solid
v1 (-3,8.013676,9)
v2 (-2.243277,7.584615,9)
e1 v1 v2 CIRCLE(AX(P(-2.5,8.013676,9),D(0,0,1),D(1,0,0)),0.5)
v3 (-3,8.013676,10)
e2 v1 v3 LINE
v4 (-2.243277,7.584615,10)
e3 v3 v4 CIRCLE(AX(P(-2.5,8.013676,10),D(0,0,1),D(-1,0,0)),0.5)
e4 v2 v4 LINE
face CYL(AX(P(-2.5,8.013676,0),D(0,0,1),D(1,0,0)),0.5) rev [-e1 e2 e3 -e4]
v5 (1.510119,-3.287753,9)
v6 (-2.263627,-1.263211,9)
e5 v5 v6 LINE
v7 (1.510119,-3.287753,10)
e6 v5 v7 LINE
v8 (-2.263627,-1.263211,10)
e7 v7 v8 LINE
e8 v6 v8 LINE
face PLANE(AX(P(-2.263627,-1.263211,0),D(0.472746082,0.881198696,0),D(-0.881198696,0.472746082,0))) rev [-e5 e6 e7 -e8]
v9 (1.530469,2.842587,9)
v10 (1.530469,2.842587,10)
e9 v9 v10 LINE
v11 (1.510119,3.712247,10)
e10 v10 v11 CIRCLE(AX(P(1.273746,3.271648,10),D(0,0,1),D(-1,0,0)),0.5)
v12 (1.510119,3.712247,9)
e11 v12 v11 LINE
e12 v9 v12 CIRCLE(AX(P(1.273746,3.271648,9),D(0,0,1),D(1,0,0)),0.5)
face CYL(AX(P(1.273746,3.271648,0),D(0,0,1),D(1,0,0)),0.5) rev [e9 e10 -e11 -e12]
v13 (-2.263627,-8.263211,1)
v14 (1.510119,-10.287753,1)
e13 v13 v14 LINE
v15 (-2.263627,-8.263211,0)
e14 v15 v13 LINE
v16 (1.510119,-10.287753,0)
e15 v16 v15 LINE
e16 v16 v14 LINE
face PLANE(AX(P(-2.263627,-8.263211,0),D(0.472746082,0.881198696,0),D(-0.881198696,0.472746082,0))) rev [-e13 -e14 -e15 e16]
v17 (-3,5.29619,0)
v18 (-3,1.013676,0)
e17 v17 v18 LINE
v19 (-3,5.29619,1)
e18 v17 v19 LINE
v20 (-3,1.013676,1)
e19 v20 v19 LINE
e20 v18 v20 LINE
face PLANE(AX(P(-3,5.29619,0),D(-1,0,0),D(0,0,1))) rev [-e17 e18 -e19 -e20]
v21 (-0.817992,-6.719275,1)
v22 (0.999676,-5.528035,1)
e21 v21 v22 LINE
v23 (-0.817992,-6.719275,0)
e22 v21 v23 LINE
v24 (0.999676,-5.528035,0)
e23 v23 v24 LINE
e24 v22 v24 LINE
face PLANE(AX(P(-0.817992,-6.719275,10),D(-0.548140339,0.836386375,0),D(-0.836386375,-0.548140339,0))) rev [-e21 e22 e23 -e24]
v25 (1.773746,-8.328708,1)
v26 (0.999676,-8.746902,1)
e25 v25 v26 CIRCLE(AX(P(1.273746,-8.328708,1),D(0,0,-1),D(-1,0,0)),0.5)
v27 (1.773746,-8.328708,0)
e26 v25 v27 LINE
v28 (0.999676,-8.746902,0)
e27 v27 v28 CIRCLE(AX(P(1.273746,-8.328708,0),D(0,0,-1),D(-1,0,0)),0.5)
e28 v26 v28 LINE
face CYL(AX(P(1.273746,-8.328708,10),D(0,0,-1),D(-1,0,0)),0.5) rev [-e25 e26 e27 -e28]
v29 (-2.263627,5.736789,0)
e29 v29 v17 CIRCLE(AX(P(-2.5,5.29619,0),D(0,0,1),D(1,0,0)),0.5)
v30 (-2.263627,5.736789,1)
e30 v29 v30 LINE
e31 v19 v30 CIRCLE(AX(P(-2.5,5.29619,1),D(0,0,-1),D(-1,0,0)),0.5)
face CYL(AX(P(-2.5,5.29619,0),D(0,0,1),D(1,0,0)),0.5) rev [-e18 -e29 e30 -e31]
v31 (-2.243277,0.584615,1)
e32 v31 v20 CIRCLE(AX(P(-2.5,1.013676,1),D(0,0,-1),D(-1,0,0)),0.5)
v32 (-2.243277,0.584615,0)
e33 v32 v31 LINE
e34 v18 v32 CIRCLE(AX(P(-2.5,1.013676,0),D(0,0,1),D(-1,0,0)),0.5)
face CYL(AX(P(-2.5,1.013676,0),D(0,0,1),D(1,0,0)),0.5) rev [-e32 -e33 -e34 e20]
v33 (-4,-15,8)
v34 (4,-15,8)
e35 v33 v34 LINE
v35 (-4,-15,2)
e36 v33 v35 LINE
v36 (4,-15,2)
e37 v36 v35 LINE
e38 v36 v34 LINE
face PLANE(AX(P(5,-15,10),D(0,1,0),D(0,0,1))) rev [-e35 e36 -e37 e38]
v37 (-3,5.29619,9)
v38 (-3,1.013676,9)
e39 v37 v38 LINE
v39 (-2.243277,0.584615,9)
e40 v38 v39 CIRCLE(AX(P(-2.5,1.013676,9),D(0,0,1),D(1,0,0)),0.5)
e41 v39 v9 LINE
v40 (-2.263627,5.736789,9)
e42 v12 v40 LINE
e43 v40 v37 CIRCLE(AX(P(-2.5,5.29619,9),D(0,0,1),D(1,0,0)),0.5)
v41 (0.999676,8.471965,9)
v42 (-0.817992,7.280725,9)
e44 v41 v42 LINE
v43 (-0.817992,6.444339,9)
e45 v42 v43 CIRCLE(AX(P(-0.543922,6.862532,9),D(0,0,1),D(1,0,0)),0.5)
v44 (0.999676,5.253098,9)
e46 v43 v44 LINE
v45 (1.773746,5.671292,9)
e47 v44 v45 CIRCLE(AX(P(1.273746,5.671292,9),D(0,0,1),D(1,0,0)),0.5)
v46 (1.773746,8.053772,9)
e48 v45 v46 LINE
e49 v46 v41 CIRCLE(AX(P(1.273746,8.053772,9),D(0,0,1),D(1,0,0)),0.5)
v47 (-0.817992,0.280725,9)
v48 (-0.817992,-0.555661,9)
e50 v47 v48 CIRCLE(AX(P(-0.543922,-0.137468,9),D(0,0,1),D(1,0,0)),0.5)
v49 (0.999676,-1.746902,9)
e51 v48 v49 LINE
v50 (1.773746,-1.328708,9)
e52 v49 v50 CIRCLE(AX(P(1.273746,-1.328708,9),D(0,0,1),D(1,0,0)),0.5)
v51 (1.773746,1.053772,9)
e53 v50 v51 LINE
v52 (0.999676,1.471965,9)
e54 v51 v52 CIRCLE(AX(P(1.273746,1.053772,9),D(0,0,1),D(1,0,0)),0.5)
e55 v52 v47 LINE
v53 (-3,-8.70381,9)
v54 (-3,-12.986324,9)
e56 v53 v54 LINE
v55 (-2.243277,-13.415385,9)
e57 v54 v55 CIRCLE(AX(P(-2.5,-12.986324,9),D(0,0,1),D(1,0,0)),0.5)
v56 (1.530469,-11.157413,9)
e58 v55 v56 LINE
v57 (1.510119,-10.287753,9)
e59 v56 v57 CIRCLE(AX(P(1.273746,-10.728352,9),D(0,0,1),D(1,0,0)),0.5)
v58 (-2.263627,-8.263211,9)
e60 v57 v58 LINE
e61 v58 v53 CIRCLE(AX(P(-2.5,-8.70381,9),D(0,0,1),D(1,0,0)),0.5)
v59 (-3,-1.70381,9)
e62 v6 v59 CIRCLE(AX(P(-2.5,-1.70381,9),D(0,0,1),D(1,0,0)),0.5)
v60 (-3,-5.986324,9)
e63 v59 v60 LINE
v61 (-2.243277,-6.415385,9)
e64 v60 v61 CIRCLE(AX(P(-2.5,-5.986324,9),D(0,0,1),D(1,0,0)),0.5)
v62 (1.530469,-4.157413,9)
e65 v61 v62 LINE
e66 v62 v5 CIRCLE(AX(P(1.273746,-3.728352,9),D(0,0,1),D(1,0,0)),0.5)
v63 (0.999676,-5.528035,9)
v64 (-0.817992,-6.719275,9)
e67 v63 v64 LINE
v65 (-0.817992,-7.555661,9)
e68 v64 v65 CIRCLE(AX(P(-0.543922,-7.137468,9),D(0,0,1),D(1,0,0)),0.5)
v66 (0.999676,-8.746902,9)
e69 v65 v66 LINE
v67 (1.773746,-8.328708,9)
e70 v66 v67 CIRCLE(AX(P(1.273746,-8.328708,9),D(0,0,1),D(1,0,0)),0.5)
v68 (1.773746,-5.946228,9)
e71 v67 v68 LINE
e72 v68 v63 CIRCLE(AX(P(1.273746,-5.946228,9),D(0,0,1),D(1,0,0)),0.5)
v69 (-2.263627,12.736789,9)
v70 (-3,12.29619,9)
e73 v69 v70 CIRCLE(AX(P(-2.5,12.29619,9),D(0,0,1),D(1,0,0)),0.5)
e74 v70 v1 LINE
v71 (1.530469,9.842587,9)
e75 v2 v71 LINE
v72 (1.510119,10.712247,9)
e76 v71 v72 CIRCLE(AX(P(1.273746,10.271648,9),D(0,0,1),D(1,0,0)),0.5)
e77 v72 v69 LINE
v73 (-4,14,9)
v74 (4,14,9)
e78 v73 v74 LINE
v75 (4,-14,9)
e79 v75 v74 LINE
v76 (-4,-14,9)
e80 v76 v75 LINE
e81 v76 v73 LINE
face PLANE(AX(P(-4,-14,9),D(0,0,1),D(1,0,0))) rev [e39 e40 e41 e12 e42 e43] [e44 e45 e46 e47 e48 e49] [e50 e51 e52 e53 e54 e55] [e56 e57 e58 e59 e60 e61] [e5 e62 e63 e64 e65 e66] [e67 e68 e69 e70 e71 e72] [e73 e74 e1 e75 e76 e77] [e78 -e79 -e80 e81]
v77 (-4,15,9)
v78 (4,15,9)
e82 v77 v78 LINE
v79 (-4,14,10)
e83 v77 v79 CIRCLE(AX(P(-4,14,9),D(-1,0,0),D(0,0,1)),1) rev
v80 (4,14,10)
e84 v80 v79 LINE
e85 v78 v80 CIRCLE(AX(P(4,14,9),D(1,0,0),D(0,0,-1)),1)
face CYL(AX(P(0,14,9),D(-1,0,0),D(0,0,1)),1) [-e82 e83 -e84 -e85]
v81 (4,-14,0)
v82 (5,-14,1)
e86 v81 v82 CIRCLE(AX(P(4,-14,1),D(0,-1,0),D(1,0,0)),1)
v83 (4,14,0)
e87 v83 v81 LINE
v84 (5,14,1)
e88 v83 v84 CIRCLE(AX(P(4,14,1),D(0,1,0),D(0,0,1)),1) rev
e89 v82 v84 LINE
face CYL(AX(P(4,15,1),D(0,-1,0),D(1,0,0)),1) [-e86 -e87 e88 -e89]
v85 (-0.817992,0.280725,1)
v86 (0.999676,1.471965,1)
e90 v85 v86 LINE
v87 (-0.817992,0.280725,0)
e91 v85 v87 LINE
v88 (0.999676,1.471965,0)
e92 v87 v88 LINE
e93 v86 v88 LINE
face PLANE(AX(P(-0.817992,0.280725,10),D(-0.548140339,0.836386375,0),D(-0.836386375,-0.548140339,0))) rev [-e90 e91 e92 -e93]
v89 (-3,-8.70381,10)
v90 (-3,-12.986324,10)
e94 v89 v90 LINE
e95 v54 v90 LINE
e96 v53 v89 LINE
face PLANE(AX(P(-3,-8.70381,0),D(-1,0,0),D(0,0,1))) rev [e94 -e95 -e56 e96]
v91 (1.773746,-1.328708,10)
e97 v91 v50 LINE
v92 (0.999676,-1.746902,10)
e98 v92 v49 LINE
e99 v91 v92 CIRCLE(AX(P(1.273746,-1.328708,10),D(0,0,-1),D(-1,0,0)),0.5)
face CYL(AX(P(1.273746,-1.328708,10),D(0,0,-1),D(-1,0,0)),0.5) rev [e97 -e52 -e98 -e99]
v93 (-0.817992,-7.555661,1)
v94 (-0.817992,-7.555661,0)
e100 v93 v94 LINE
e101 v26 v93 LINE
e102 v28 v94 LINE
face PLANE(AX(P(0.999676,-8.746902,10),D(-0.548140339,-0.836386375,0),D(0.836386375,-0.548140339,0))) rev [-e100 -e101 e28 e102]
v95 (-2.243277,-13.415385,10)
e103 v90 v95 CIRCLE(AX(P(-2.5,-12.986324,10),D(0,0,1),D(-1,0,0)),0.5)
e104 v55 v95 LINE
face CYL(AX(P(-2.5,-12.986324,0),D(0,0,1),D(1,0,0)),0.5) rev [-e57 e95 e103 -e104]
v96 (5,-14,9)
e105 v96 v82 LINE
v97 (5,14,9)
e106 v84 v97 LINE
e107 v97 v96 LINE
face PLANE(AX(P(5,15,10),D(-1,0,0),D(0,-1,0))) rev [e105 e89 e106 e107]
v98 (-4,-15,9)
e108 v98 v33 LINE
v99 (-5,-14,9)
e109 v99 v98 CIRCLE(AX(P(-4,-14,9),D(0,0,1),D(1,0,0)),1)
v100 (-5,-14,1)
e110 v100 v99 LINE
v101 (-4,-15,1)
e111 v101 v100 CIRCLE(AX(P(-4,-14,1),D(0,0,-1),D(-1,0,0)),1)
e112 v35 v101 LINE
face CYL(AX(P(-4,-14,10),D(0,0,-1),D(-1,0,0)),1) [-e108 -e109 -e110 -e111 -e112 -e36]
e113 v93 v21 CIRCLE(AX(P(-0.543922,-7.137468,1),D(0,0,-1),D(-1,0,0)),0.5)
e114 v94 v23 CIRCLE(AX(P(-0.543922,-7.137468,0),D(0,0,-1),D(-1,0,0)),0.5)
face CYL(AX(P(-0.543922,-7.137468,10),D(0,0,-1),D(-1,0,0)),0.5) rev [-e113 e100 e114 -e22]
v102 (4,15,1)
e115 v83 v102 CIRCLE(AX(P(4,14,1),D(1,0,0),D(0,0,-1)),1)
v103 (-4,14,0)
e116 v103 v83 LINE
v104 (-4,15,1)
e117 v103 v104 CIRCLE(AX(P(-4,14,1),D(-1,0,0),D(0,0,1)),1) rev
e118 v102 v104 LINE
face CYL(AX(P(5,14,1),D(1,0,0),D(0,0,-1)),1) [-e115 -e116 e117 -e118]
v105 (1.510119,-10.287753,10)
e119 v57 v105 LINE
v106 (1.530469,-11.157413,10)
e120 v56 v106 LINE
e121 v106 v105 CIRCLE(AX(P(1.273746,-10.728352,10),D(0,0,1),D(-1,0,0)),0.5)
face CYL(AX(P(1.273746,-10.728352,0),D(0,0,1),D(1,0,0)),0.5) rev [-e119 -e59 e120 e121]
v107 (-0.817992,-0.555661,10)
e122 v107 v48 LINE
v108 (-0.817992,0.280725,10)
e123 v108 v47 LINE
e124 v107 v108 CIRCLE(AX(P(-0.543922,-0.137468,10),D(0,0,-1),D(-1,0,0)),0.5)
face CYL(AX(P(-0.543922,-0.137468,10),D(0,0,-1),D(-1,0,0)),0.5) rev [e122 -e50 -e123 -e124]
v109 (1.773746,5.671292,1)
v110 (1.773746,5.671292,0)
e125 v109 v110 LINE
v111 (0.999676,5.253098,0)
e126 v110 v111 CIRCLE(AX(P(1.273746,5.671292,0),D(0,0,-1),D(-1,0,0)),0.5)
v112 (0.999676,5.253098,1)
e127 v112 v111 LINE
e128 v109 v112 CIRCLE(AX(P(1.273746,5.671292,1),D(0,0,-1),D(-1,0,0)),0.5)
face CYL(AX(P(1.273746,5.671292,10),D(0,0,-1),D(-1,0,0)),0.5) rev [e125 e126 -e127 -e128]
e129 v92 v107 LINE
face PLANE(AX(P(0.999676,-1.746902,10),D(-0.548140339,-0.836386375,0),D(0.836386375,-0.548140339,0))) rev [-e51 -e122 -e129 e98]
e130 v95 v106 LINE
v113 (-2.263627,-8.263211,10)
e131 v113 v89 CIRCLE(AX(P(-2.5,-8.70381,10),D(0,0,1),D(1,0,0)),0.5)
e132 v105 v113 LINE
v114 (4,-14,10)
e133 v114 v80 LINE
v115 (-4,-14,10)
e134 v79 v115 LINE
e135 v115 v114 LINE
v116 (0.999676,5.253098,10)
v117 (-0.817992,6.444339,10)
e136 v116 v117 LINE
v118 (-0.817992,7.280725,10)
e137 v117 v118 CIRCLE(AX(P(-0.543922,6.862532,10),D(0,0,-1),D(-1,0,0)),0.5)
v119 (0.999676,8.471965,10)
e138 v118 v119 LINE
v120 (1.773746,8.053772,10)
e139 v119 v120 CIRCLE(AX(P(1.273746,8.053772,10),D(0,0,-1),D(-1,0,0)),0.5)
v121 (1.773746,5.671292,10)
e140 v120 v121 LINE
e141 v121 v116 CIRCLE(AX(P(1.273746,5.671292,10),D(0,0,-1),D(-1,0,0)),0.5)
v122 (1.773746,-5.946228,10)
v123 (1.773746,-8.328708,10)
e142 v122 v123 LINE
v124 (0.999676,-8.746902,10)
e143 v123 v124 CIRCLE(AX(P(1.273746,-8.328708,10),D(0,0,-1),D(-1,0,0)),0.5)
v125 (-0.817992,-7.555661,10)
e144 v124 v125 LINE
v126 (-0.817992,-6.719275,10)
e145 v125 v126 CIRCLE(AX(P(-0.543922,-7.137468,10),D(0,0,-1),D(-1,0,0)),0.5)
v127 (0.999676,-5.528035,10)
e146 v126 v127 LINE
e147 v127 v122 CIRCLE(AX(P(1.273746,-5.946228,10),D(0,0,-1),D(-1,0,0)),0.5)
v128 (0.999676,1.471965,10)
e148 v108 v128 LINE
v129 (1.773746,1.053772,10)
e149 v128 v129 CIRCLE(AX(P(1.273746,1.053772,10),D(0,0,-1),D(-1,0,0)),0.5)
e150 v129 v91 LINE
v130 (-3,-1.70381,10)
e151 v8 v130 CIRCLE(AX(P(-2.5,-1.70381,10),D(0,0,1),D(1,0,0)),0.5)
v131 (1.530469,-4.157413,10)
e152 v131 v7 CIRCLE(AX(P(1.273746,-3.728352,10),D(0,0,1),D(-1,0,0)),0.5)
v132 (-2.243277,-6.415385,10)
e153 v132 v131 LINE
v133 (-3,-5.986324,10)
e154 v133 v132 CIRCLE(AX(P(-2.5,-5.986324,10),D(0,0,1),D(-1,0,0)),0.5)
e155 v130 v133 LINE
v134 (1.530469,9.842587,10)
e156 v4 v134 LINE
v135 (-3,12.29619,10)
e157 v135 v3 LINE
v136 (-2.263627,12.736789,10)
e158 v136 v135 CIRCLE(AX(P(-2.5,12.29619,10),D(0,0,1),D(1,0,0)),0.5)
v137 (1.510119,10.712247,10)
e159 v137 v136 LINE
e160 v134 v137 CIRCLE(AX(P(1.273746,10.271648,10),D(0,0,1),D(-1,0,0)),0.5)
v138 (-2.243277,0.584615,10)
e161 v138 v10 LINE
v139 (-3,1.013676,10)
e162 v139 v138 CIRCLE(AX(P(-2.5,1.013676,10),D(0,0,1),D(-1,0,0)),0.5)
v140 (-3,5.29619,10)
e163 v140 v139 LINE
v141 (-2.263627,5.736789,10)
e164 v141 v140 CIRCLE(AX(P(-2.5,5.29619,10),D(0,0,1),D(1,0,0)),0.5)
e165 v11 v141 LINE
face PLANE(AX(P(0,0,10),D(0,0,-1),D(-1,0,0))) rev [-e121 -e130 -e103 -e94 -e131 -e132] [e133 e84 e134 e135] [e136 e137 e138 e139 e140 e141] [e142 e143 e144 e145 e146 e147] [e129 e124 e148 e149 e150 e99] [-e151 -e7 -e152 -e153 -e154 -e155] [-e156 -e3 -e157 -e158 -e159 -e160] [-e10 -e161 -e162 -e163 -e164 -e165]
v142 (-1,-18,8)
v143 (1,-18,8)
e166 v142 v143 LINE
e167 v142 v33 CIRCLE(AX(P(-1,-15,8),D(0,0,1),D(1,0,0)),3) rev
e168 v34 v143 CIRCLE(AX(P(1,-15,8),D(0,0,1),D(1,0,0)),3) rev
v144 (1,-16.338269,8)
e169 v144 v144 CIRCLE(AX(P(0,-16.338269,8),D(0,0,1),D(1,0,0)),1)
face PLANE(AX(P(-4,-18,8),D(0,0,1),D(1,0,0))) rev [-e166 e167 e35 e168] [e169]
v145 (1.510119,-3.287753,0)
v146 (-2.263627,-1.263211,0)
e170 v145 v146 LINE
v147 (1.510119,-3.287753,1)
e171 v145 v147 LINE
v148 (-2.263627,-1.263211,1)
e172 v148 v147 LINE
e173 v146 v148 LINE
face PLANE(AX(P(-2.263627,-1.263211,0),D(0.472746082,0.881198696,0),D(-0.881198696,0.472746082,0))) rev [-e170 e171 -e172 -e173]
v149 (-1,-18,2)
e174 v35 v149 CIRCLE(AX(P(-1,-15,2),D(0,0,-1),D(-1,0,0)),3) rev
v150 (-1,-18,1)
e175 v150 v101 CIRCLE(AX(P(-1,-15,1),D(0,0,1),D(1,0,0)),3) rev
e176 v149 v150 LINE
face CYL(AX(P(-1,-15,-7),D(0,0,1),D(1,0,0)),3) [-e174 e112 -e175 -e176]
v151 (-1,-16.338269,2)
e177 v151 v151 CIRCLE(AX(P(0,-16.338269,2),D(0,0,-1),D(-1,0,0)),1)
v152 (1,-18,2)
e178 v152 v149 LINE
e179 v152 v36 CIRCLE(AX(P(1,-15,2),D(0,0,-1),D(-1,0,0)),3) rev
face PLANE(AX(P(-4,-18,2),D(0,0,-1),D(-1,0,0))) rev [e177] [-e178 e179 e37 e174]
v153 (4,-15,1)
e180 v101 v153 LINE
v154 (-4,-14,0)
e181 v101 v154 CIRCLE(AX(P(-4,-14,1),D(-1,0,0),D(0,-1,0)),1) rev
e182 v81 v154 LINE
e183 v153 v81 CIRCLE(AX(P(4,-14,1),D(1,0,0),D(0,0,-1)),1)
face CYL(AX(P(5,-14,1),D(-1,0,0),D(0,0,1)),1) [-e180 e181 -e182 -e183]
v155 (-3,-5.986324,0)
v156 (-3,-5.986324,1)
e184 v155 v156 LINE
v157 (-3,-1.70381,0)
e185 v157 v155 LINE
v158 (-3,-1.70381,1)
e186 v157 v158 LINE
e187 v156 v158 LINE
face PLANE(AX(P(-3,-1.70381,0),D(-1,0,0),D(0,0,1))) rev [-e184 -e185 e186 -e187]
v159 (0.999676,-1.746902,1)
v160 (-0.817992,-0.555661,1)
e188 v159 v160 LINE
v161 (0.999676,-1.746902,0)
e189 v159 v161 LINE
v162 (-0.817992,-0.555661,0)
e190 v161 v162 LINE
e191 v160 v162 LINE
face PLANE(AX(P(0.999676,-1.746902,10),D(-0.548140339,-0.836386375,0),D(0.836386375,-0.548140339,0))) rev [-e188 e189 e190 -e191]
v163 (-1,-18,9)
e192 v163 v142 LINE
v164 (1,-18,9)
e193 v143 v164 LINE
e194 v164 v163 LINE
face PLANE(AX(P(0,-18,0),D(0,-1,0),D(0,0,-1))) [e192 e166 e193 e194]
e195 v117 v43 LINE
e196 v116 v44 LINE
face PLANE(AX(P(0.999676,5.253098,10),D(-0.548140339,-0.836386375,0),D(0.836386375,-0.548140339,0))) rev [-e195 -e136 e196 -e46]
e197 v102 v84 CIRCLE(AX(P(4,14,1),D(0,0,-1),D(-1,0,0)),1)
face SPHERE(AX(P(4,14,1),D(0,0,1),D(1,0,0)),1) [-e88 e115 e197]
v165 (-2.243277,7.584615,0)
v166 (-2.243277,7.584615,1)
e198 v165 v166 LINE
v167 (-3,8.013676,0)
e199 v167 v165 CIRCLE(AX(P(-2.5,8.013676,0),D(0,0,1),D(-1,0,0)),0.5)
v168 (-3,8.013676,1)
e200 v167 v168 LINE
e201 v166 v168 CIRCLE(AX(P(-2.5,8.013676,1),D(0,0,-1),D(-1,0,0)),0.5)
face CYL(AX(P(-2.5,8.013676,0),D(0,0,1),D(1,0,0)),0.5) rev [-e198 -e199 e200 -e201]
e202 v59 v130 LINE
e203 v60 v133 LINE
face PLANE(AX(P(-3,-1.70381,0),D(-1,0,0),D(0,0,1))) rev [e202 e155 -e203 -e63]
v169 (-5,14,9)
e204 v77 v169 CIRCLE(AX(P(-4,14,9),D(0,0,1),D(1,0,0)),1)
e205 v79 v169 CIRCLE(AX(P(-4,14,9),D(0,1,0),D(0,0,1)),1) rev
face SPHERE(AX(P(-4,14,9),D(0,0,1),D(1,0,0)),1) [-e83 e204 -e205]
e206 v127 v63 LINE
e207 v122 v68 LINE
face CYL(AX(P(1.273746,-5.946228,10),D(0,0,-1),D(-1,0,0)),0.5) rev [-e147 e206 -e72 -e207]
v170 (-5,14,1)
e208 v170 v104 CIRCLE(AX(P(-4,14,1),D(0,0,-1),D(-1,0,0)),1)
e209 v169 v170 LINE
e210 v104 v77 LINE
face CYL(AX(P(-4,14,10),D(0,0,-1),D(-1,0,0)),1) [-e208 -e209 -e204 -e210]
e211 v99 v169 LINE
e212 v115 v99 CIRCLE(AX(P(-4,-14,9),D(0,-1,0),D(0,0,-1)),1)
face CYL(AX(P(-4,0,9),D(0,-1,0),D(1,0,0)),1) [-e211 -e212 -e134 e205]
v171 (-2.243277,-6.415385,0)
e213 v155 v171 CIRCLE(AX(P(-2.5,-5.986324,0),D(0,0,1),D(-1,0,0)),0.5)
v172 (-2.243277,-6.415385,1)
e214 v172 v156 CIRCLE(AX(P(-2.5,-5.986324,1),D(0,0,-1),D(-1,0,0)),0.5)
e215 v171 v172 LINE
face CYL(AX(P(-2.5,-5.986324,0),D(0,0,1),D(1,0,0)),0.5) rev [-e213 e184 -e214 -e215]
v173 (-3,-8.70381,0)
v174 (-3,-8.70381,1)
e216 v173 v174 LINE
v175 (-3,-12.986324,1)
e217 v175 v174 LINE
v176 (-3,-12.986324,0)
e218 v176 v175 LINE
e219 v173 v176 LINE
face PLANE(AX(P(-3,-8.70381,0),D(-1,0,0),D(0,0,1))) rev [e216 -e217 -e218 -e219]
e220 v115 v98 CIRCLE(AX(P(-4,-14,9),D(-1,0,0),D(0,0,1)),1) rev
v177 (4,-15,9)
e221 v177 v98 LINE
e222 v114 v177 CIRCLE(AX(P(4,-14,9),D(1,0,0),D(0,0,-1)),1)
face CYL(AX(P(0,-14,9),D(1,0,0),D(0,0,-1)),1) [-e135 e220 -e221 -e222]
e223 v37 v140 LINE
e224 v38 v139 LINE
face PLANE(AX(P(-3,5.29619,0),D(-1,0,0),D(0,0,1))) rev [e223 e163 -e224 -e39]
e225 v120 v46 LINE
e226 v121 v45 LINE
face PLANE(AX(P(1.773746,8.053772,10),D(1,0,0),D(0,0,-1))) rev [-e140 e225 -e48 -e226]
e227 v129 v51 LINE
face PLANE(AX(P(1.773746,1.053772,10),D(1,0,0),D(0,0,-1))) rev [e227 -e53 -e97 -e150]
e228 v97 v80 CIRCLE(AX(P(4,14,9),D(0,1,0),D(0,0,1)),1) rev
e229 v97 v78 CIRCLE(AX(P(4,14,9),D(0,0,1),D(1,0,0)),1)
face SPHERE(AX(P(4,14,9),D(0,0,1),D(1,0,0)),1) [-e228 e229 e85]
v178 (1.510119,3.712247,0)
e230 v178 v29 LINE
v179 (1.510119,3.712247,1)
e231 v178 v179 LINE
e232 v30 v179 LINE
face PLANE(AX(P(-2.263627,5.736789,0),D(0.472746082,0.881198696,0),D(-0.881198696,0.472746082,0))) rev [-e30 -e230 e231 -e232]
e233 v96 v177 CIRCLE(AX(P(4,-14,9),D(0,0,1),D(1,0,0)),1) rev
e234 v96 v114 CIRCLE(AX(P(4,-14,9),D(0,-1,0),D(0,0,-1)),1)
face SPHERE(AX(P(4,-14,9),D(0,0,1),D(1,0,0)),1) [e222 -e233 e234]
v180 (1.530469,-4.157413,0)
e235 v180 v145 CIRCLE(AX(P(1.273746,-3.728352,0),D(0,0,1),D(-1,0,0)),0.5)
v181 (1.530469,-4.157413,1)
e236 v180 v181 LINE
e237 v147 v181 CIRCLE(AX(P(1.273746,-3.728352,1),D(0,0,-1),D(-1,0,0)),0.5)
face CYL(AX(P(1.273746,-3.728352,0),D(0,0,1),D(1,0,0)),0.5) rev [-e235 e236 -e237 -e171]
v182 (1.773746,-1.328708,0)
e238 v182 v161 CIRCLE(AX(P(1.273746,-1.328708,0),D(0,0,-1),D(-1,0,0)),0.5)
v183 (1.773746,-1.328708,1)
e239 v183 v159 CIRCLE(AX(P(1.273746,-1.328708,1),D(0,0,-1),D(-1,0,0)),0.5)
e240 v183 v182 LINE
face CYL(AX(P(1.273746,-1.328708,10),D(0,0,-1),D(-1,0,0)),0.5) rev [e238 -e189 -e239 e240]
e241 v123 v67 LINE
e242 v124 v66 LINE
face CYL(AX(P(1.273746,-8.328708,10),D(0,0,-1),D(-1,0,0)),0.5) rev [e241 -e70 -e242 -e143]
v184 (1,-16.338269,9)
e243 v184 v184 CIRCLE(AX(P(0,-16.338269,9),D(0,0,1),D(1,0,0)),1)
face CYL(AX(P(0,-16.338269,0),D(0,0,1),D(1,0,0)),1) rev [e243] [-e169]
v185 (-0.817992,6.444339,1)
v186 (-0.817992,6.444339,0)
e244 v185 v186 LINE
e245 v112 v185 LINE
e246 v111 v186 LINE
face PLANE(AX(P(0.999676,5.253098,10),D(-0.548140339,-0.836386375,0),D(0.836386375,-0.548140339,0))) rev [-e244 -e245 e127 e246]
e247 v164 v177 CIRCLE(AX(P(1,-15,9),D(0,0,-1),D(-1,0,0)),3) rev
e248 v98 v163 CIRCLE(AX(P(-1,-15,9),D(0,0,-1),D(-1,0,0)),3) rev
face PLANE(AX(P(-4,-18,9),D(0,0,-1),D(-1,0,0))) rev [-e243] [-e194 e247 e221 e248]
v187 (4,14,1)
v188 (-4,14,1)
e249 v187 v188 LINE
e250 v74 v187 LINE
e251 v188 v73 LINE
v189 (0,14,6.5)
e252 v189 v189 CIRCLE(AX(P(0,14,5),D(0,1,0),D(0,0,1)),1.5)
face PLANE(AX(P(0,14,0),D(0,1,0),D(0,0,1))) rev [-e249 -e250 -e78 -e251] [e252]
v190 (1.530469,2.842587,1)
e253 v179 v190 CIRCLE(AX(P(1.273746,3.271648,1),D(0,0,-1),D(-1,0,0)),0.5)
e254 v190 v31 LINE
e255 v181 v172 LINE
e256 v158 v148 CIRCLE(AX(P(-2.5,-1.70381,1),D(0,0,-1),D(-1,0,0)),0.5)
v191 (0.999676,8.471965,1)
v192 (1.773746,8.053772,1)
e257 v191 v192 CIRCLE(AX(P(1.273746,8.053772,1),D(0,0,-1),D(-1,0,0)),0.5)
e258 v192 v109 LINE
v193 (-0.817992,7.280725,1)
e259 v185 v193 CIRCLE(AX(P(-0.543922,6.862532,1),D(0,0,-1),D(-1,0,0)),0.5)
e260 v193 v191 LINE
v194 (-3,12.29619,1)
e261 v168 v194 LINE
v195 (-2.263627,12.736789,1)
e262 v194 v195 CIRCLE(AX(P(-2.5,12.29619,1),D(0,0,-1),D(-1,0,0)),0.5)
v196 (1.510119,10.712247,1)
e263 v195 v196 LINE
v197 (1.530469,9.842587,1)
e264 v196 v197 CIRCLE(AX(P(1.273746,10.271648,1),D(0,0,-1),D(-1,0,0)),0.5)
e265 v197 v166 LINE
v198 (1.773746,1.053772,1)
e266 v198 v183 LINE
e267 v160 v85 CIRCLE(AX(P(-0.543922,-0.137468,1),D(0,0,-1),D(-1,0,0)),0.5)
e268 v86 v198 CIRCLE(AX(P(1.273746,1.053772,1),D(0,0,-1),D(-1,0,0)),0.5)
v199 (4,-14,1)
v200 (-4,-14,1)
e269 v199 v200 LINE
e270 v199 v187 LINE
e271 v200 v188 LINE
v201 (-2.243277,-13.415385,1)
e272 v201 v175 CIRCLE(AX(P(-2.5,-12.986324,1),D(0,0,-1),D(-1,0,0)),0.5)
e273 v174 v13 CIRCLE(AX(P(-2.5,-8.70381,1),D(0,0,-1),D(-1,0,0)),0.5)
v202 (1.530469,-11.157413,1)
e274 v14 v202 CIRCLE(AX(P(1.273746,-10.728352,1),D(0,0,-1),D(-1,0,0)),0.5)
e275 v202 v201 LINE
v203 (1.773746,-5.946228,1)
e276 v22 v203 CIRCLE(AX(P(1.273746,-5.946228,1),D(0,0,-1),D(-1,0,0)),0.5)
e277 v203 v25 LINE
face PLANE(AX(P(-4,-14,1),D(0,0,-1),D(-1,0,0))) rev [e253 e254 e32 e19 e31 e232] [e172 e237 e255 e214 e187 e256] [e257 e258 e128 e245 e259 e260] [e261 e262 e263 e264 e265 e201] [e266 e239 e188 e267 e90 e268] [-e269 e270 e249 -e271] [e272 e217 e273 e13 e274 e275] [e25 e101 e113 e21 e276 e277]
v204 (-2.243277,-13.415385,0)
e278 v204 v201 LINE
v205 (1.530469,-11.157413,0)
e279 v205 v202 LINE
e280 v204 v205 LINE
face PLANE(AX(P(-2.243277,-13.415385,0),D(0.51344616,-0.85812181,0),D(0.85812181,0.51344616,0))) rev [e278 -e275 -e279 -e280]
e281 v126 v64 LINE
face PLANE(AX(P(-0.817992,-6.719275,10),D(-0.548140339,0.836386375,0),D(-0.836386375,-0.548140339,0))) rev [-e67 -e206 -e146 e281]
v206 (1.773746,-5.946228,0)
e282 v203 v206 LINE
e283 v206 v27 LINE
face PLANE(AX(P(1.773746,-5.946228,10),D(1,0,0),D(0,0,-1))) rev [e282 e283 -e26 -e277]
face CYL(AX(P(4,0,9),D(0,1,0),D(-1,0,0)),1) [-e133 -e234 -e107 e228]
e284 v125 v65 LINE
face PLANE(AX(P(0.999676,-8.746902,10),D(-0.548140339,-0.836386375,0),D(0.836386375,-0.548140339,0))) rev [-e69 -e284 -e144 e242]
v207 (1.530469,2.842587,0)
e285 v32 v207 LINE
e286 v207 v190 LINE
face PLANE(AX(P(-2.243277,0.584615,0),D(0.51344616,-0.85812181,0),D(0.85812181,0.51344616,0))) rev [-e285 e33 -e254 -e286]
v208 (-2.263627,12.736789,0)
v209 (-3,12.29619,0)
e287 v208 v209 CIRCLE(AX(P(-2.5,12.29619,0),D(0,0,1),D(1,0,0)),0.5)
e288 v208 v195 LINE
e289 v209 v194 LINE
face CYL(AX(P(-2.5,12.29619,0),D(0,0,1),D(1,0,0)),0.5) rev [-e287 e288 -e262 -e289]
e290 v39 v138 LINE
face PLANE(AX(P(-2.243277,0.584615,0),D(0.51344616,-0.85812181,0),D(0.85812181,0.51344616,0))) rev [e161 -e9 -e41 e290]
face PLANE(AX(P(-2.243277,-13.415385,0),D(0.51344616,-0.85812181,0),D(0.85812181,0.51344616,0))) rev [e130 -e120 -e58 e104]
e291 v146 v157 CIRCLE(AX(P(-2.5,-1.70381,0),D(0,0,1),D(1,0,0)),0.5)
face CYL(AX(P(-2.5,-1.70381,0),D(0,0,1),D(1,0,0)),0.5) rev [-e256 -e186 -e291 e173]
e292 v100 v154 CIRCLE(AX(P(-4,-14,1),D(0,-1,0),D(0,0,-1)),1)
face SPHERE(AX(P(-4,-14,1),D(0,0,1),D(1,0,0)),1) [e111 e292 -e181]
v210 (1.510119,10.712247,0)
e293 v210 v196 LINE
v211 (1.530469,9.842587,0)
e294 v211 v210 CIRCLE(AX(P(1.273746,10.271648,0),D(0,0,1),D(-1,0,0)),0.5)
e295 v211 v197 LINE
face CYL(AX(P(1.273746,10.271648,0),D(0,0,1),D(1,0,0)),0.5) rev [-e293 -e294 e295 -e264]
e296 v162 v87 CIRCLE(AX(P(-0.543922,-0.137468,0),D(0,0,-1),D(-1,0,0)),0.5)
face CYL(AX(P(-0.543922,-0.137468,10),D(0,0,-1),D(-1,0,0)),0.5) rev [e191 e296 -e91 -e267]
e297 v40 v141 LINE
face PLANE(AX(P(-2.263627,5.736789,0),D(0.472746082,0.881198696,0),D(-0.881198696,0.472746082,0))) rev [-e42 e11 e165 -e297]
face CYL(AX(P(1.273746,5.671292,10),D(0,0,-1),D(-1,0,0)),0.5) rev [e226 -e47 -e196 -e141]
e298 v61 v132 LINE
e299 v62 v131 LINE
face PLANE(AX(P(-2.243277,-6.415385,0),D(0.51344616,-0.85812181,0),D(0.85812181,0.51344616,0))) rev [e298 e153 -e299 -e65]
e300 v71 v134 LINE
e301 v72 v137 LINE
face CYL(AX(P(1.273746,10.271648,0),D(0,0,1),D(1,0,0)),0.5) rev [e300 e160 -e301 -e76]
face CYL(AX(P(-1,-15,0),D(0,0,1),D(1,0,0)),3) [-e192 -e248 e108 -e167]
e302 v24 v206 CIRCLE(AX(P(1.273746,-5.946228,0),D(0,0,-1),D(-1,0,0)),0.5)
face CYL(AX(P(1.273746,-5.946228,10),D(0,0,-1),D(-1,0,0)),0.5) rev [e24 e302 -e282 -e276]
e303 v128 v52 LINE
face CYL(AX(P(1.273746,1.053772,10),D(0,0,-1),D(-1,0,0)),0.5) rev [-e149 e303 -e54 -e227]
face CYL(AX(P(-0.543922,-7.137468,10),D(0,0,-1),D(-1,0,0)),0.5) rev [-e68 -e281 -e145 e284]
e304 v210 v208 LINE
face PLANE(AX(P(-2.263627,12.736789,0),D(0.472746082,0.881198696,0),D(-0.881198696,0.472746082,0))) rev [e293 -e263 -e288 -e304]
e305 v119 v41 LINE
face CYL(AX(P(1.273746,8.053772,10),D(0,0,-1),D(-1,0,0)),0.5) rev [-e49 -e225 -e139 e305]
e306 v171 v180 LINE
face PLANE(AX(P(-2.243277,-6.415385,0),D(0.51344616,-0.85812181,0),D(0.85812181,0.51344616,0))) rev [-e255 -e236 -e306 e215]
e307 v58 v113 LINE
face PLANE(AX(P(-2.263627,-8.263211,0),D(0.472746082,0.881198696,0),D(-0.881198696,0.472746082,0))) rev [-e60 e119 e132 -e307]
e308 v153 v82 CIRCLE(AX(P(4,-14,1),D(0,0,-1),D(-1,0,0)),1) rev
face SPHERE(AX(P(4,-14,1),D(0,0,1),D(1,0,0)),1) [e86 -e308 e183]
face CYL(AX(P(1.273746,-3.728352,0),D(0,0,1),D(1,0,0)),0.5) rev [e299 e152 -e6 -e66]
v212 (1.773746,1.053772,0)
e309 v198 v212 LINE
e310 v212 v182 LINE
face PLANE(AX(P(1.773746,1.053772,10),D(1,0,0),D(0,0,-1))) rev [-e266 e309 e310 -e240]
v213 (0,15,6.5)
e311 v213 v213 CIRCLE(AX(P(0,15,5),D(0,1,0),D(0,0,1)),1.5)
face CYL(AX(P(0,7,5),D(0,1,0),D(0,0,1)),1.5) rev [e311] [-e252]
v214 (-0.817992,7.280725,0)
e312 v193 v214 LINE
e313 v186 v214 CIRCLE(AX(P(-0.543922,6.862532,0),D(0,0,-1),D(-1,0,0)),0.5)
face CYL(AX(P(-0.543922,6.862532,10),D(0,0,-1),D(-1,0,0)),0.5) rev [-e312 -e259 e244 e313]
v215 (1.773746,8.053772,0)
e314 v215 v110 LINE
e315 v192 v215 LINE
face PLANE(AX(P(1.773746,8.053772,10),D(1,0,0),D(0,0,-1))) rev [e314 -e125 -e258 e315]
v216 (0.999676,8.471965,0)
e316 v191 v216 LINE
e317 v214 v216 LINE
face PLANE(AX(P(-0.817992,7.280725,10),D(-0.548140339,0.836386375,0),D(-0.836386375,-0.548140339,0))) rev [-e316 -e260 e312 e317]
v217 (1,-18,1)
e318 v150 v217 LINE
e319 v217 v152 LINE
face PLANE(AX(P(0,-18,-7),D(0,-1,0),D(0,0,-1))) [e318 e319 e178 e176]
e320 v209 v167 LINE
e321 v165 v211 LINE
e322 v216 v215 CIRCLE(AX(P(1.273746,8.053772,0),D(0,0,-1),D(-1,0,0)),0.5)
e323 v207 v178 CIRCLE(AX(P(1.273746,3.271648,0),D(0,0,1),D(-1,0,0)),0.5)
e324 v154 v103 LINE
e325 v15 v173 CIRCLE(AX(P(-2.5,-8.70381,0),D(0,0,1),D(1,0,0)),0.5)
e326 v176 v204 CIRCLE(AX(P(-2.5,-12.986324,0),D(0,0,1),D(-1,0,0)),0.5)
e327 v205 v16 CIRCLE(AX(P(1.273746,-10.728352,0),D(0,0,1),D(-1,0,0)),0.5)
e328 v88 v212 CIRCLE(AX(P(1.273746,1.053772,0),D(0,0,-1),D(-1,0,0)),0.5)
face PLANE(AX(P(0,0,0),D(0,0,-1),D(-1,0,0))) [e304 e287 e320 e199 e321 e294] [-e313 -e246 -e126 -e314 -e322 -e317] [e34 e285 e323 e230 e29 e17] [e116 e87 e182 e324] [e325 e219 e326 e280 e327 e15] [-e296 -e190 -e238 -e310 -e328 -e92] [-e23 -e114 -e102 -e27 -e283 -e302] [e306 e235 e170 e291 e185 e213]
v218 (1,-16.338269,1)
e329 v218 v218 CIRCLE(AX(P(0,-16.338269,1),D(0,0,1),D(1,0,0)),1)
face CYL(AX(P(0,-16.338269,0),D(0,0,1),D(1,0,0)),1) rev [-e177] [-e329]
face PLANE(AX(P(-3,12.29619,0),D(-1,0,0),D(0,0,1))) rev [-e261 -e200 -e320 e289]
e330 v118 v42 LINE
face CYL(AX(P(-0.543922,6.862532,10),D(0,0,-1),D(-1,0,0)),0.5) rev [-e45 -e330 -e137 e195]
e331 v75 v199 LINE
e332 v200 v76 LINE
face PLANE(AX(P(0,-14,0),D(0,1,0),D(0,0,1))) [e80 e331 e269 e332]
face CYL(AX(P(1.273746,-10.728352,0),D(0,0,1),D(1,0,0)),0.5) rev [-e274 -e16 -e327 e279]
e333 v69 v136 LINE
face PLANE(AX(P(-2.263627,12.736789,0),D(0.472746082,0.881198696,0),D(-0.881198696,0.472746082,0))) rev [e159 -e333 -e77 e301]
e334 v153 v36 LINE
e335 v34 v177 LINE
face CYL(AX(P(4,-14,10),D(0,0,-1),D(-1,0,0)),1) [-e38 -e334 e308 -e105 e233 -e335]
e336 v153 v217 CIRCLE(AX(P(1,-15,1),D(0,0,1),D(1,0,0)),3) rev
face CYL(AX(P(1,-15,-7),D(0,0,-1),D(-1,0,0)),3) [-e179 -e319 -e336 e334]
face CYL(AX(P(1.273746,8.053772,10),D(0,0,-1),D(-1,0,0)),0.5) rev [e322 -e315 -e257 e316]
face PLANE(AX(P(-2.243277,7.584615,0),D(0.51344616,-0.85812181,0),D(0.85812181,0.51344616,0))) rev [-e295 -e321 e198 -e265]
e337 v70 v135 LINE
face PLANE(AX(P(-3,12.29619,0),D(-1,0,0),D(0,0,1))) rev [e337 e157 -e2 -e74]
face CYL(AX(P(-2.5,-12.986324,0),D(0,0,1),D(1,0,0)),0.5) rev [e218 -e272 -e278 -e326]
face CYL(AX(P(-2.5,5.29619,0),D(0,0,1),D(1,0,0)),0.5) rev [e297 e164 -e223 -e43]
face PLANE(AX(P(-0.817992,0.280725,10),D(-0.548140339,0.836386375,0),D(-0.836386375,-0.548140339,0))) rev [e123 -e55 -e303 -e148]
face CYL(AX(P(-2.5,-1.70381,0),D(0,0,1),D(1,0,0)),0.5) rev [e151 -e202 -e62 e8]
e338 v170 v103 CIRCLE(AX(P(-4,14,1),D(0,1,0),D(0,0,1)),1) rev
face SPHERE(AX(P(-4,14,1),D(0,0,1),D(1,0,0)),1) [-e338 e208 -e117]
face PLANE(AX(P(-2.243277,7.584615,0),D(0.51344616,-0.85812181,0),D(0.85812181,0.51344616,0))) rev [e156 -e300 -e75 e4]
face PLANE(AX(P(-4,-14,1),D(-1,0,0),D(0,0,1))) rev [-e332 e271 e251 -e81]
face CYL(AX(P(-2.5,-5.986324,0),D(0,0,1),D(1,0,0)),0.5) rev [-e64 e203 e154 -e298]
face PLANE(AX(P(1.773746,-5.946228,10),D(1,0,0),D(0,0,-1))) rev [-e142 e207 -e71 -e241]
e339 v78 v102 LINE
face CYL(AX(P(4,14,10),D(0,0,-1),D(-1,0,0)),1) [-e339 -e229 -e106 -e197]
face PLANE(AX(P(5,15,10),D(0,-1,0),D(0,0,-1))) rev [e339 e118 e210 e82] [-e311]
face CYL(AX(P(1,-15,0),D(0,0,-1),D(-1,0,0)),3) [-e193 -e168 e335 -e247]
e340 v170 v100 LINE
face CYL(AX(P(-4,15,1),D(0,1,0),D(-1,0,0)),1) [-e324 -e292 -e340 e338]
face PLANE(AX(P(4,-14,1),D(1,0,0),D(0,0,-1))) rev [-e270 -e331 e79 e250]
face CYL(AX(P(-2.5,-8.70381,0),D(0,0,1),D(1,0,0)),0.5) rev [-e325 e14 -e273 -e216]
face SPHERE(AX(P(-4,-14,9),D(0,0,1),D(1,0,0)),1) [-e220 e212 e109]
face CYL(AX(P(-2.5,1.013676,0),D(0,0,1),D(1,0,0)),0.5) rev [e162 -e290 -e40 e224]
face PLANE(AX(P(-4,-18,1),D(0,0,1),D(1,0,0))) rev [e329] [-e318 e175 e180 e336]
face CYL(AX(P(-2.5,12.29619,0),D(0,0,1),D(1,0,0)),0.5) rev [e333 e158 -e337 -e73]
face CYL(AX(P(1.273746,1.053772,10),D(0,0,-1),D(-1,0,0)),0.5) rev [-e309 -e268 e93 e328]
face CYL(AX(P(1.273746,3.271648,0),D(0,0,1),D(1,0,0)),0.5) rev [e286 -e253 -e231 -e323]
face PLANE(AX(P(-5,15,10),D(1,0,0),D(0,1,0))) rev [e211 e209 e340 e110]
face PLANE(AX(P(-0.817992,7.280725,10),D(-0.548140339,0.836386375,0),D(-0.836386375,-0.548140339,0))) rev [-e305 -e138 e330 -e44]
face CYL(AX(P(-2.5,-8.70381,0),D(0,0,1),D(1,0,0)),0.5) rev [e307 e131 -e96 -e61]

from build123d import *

# Parameters (mm, degrees)
SKETCH1_W           = 10
SKETCH1_H           = 30
BOSS_EXTRUDE1_DEPTH = 10
FILLET2_R           = 1
SKETCH2_W           = 8
SKETCH2_H           = 8
CUT_EXTRUDE1_DEPTH  = 28
SKETCH4_R           = 1.5
CUT_EXTRUDE2_DEPTH  = 8
CUT_EXTRUDE3_DEPTH  = 19.708286934
LPATTERN1_COUNT     = 4
LPATTERN1_PITCH     = 7
CUT_EXTRUDE4_DEPTH  = 19.708286934
LPATTERN2_COUNT     = 3
LPATTERN2_PITCH     = 7
SKETCH7_W           = 8
SKETCH7_H           = 1
BOSS_EXTRUDE2_DEPTH = 3
FILLET4_R           = 3
LPATTERN3_COUNT     = 2
LPATTERN3_PITCH     = 7
FILLET5_R           = 3
SKETCH8_R           = 1
CUT_EXTRUDE5_DEPTH  = 21.736441353


with BuildPart() as part:
    # Sketch1 → Boss-Extrude1 (new body)
    with BuildSketch(Plane.XY):
        Rectangle(SKETCH1_W, SKETCH1_H)
    extrude(amount=BOSS_EXTRUDE1_DEPTH)

    # Fillet2
    fillet2_edges = [part.edges().sort_by_distance(p)[0] for p in [
        (5, 0, 10),
        (0, 15, 10),
        (-5, 0, 10),
        (0, 15, 0),
        (5, 0, 0),
        (0, -15, 0),
        (-5, 0, 0),
        (-5, 15, 5),
        (5, 15, 5),
        (5, -15, 5),
        (-5, -15, 5),
        (0, -15, 10),
    ]]
    fillet(fillet2_edges, radius=FILLET2_R)

    # Sketch2 → Cut-Extrude1 (cut)
    with BuildSketch(Plane(origin=(0, 14, 0), x_dir=(1, 0, 0), z_dir=(0, 1, 0))):
        with Locations((0, -5)):
            Rectangle(SKETCH2_W, SKETCH2_H)
    extrude(amount=-CUT_EXTRUDE1_DEPTH, mode=Mode.SUBTRACT)

    # Sketch4 → Cut-Extrude2 (cut)
    with BuildSketch(Plane(origin=(0, 15, 0), x_dir=(1, 0, 0), z_dir=(0, 1, 0))):
        with Locations(Location((0, -5, 0), (0, 0, 270))):
            Circle(SKETCH4_R)
    extrude(amount=-CUT_EXTRUDE2_DEPTH, mode=Mode.SUBTRACT)

    # Sketch5 → Cut-Extrude3 (cut, through all)
    with BuildSketch(Plane.XY.offset(10)):
        with BuildLine():
            Line((-2.263626959, 12.736789234), (1.510119058, 10.712247379))
            ThreePointArc((1.510119058, 10.712247379), (1.773609184, 10.283344823), (1.530469097, 9.842587126))
            Line((1.530469097, 9.842587126), (-2.24327692, 7.584614681))
            ThreePointArc((-2.24327692, 7.584614681), (-2.746615551, 7.578726428), (-3, 8.013675586))
            Line((-3, 8.013675586), (-3, 12.296189886))
            ThreePointArc((-3, 12.296189886), (-2.75672308, 12.725250791), (-2.263626959, 12.736789234))
        make_face()
    cut_extrude3 = extrude(amount=-CUT_EXTRUDE3_DEPTH, mode=Mode.SUBTRACT)

    # LPattern1: Cut-Extrude3 ×4
    with Locations(*[(0, -i * LPATTERN1_PITCH, 0) for i in range(1, LPATTERN1_COUNT)]):
        add(cut_extrude3, mode=Mode.SUBTRACT)

    # Sketch6 → Cut-Extrude4 (cut, through all)
    with BuildSketch(Plane(origin=(0, 0, 0), x_dir=(-1, 0, 0), z_dir=(0, 0, -1))):
        with BuildLine():
            Line((-1.773746018, 8.053772264), (-1.773746018, 5.671291651))
            ThreePointArc((-1.773746018, 5.671291651), (-1.5114064, 5.231385363), (-0.999675848, 5.253098463))
            Line((-0.999675848, 5.253098463), (0.817992167, 6.44433877))
            ThreePointArc((0.817992167, 6.44433877), (1.043921997, 6.862531957), (0.817992167, 7.280725145))
            Line((0.817992167, 7.280725145), (-0.999675848, 8.471965452))
            ThreePointArc((-0.999675848, 8.471965452), (-1.5114064, 8.493678552), (-1.773746018, 8.053772264))
        make_face()
    cut_extrude4 = extrude(amount=-CUT_EXTRUDE4_DEPTH, mode=Mode.SUBTRACT)

    # LPattern2: Cut-Extrude4 ×3
    with Locations(*[(0, -i * LPATTERN2_PITCH, 0) for i in range(1, LPATTERN2_COUNT)]):
        add(cut_extrude4, mode=Mode.SUBTRACT)

    # Sketch7 → Boss-Extrude2 (add)
    with BuildSketch(Plane.XZ.offset(15)):
        with Locations((0, 8.5)):
            Rectangle(SKETCH7_W, SKETCH7_H)
    boss_extrude2 = extrude(amount=BOSS_EXTRUDE2_DEPTH)

    # Fillet4
    fillet4_edges = [part.edges().sort_by_distance(p)[0] for p in [
        (4, -18, 8.5),
        (-4, -18, 8.5),
    ]]
    fillet(fillet4_edges, radius=FILLET4_R - 0.0001)  # a hair under: the kernel refuses the full size

    # LPattern3: Boss-Extrude2 ×2
    with Locations(*[(0, 0, -i * LPATTERN3_PITCH) for i in range(1, LPATTERN3_COUNT)]):
        add(boss_extrude2)

    # Fillet5
    fillet5_edges = [part.edges().sort_by_distance(p)[0] for p in [
        (4, -18, 1.5),
        (-4, -18, 1.5),
    ]]
    fillet(fillet5_edges, radius=FILLET5_R - 0.0001)  # a hair under: the kernel refuses the full size

    # Sketch8 → Cut-Extrude5 (cut, through all)
    with BuildSketch(Plane.XY.offset(9)):
        with Locations((0, -16.338268511)):
            Circle(SKETCH8_R)
    extrude(amount=-CUT_EXTRUDE5_DEPTH, mode=Mode.SUBTRACT)


solid = part.part
